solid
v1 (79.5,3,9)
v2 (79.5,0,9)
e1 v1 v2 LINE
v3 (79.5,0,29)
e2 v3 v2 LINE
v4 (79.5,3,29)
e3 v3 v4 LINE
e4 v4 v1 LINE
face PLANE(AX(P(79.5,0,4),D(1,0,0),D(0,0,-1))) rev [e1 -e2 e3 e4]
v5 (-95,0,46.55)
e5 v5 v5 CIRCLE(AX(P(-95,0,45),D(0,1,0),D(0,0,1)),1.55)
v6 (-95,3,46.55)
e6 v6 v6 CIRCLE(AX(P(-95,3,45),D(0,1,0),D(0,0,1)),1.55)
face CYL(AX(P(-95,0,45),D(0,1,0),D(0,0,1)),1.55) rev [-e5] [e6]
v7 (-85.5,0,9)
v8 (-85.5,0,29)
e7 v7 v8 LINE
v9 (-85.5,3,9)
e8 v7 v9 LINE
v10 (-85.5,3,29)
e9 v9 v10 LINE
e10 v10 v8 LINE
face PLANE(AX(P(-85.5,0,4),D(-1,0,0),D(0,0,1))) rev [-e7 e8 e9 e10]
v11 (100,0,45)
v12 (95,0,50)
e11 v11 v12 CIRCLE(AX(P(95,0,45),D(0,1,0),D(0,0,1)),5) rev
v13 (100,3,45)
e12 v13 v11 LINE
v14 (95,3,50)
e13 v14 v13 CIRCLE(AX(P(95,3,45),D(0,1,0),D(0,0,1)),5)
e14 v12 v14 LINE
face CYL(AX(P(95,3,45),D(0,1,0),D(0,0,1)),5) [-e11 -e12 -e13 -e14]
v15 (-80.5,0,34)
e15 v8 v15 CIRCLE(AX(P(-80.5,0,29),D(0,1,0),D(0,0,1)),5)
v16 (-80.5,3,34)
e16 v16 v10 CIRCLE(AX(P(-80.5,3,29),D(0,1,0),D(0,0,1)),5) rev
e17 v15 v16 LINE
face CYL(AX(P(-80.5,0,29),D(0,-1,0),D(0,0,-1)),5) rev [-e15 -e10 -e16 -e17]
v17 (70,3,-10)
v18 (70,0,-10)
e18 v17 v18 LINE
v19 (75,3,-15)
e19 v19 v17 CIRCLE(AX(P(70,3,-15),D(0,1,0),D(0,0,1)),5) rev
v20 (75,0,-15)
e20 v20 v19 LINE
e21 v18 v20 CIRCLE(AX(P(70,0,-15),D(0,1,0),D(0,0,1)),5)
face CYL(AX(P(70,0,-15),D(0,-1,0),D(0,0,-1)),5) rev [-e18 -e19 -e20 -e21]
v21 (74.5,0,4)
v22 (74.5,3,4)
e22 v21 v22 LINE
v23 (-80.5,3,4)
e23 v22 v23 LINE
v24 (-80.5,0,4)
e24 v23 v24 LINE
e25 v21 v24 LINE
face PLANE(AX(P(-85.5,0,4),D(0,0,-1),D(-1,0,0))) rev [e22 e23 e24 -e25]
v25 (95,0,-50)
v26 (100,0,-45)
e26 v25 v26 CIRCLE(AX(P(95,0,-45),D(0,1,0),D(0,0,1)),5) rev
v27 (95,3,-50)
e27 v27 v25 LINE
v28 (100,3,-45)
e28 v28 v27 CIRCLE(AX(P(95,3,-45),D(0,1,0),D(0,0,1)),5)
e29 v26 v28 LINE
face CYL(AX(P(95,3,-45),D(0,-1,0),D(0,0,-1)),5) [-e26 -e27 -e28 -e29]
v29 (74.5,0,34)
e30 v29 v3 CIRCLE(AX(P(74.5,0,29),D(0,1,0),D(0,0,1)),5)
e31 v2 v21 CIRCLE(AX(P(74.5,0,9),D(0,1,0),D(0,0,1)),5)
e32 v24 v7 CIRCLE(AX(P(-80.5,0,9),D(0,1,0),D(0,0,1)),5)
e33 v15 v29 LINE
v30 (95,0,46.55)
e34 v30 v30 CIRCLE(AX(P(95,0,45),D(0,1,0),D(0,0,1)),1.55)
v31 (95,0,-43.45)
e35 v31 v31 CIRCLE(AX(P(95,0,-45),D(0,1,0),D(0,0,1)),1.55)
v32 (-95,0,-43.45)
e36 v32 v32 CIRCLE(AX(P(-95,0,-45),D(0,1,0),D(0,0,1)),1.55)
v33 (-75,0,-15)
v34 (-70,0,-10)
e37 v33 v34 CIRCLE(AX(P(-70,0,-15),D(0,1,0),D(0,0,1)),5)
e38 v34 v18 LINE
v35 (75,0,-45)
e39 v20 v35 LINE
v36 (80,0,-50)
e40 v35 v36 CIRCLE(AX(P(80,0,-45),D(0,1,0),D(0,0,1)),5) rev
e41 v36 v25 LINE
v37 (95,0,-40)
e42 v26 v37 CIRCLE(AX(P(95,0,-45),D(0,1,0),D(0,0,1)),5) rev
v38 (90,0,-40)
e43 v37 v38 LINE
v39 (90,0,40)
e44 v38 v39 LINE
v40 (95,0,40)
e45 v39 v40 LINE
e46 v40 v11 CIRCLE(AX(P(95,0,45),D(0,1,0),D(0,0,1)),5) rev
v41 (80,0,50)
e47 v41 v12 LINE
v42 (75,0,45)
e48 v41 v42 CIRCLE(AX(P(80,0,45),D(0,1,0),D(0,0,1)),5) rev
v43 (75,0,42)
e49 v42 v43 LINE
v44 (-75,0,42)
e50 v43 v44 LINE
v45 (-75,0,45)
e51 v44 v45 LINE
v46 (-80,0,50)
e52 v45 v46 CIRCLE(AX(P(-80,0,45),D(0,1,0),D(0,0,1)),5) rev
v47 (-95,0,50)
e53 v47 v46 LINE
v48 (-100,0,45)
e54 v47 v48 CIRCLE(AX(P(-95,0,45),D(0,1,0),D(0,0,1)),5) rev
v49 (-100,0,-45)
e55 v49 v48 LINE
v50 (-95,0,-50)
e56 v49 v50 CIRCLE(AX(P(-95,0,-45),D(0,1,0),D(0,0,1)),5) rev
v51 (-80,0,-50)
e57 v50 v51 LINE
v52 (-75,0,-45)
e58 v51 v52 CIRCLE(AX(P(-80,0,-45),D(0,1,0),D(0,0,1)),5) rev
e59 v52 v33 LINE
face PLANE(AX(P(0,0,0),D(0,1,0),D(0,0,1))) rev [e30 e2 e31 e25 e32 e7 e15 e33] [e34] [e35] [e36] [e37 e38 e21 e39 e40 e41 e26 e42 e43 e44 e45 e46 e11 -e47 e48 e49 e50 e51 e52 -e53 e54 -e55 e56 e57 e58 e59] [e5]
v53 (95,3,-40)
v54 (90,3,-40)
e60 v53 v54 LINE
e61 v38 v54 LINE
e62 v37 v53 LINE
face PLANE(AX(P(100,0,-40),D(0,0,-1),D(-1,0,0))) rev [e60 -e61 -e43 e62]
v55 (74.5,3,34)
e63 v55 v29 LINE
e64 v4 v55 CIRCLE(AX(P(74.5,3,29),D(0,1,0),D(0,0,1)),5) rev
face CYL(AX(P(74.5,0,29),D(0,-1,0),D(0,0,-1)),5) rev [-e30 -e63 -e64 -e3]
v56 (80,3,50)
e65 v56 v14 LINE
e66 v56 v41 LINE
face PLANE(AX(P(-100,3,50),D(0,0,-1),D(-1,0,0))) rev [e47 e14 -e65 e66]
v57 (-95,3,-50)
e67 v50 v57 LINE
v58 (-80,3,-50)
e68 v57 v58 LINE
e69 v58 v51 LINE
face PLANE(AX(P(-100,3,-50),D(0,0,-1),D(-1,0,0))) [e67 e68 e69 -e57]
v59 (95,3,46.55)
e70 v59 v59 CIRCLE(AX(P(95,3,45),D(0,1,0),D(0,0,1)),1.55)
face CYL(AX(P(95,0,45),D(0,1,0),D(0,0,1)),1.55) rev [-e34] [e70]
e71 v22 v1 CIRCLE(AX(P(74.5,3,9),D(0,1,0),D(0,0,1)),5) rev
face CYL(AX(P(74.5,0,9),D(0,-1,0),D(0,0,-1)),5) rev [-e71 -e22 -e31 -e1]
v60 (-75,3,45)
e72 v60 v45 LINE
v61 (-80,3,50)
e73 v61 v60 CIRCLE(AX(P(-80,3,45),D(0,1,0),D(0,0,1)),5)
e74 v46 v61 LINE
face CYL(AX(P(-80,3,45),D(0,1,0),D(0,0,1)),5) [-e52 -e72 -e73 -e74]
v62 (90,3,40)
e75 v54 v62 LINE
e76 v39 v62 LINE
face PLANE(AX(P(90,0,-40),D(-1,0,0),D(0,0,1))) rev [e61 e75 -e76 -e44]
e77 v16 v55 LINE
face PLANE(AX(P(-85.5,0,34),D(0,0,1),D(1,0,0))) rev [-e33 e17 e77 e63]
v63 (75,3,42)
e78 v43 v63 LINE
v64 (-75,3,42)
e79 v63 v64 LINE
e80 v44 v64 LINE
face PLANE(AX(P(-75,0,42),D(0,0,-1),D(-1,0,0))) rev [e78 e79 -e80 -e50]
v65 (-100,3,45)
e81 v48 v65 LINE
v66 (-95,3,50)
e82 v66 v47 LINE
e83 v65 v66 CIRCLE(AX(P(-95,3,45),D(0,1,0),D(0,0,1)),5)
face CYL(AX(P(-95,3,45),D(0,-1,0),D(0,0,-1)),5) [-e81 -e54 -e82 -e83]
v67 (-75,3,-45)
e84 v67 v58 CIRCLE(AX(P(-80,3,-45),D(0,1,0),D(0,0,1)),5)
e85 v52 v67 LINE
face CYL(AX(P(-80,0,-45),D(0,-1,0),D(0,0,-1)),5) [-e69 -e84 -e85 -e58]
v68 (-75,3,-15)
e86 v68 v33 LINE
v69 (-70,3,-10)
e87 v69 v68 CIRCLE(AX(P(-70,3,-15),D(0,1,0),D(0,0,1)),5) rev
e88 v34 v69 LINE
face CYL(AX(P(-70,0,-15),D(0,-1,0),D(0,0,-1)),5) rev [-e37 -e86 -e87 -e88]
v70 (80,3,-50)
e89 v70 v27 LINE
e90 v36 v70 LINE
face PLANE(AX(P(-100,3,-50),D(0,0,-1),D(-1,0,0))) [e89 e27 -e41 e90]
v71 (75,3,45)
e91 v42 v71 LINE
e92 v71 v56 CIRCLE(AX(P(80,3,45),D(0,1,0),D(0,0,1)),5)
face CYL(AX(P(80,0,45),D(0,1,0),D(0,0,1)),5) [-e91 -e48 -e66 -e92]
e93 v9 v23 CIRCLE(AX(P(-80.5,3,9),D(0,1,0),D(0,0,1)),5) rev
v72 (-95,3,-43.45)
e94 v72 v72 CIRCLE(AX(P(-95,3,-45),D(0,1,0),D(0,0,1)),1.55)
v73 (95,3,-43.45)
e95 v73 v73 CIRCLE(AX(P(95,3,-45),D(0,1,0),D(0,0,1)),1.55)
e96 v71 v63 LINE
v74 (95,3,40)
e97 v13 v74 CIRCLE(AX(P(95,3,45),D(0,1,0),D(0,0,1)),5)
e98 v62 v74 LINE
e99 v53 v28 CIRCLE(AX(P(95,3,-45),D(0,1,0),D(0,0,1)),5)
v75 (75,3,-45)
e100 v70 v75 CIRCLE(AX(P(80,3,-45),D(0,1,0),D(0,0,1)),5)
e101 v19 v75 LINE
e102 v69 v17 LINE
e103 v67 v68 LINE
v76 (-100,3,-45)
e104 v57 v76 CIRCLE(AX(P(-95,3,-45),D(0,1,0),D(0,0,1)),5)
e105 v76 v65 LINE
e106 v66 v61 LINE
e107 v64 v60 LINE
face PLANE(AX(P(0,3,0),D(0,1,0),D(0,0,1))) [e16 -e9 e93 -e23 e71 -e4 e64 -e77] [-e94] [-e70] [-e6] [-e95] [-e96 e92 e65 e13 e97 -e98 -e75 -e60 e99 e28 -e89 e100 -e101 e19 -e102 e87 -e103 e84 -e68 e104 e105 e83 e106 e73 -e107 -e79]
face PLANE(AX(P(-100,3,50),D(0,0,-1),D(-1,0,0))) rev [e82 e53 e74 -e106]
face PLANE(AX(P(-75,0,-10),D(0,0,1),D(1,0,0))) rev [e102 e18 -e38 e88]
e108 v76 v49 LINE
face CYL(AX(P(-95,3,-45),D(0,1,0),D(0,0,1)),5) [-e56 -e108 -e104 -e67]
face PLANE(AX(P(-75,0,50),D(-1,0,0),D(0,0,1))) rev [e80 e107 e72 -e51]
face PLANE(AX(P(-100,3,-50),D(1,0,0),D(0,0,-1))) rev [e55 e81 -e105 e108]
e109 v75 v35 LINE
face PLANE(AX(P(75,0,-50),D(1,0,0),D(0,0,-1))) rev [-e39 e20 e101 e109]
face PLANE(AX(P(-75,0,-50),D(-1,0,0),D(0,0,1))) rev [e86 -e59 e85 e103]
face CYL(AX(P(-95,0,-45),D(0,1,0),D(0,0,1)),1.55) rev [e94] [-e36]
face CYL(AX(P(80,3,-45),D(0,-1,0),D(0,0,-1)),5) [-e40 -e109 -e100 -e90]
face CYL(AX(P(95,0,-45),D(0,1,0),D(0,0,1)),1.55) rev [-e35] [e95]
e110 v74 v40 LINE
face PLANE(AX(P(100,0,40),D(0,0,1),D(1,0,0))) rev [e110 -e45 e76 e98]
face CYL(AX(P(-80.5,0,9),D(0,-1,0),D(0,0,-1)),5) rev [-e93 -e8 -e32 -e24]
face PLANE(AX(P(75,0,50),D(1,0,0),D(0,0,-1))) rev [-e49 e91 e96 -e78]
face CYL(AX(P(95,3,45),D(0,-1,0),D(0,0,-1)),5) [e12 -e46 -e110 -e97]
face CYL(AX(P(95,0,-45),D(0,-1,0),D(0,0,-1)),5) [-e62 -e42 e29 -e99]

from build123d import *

# Parameters (mm, degrees)
SKETCH1_W           = 200
SKETCH1_H           = 100
BOSS_EXTRUDE1_DEPTH = 3
SKETCH2_R           = 1.55
CUT_EXTRUDE1_DEPTH  = 112.843640856
FILLET1_R           = 5
SKETCH3_W           = 150
SKETCH3_H           = 40
SKETCH3_W_2         = 10
SKETCH3_H_2         = 80
SKETCH3_H_3         = 8
SKETCH3_W_3         = 165
SKETCH3_H_4         = 30
CUT_EXTRUDE2_DEPTH  = 112.843640856
FILLET2_START       = -1
FILLET2_DEPTH       = 5
FILLET2_2_DEPTH     = 3


with BuildPart() as part:
    # Sketch1 → Boss-Extrude1 (new body)
    with BuildSketch(Plane(origin=(0, 0, 0), x_dir=(1, 0, 0), z_dir=(0, 1, 0))):
        Rectangle(SKETCH1_W, SKETCH1_H)
    extrude(amount=BOSS_EXTRUDE1_DEPTH)

    # Sketch2 → Cut-Extrude1 (cut, through all)
    with BuildSketch(Plane(origin=(0, 3, 0), x_dir=(1, 0, 0), z_dir=(0, 1, 0))):
        with Locations(Location((-95, 45, 0), (0, 0, 270))):
            Circle(SKETCH2_R)
        with Locations(Location((-95, -45, 0), (0, 0, 270))):
            Circle(SKETCH2_R)
        with Locations(Location((95, 45, 0), (0, 0, 270))):
            Circle(SKETCH2_R)
        with Locations(Location((95, -45, 0), (0, 0, 270))):
            Circle(SKETCH2_R)
    extrude(amount=-CUT_EXTRUDE1_DEPTH, mode=Mode.SUBTRACT)

    # Fillet1
    fillet1_edges = [part.edges().sort_by_distance(p)[0] for p in [
        (-100, 1.5, -50),
        (100, 1.5, -50),
        (100, 1.5, 50),
        (-100, 1.5, 50),
    ]]
    fillet(fillet1_edges, radius=FILLET1_R)

    # Sketch3 → Cut-Extrude2 (cut, through all)
    with BuildSketch(Plane(origin=(0, 3, 0), x_dir=(1, 0, 0), z_dir=(0, 1, 0))):
        with Locations((0, 30)):
            Rectangle(SKETCH3_W, SKETCH3_H)
        with Locations((95, 0)):
            Rectangle(SKETCH3_W_2, SKETCH3_H_2)
        with Locations((0, -46)):
            Rectangle(SKETCH3_W, SKETCH3_H_3)
        with Locations((-3, -19)):
            Rectangle(SKETCH3_W_3, SKETCH3_H_4)
    extrude(amount=-CUT_EXTRUDE2_DEPTH, mode=Mode.SUBTRACT)

    # Fillet2: read off the stored shape, not the designer's step
    # Fillet2 outline → Fillet2 (cut)
    with BuildSketch(Plane(origin=(0, 0, 0), x_dir=(1, 0, 0), z_dir=(0, 1, 0)).offset(FILLET2_START)):
        with BuildLine():
            Line((100, 40), (100, 45))
            ThreePointArc((100, 45), (98.535533906, 41.464466094), (95, 40))
            Line((95, 40), (100, 40))
        make_face()
        with BuildLine():
            ThreePointArc((-80, 50), (-76.464466094, 48.535533906), (-75, 45))
            Line((-75, 45), (-75, 50))
            Line((-75, 50), (-80, 50))
        make_face()
        with BuildLine():
            ThreePointArc((75, 45), (76.464466094, 48.535533906), (80, 50))
            Line((80, 50), (75, 50))
            Line((75, 50), (75, 45))
        make_face()
        with BuildLine():
            Line((100, -40), (95, -40))
            ThreePointArc((95, -40), (98.535533906, -41.464466094), (100, -45))
            Line((100, -45), (100, -40))
        make_face()
        with BuildLine():
            Line((75, -50), (80, -50))
            ThreePointArc((80, -50), (76.464466094, -48.535533906), (75, -45))
            Line((75, -45), (75, -50))
        make_face()
        with BuildLine():
            ThreePointArc((-75, -45), (-76.464466094, -48.535533906), (-80, -50))
            Line((-80, -50), (-75, -50))
            Line((-75, -50), (-75, -45))
        make_face()
    extrude(amount=FILLET2_DEPTH, mode=Mode.SUBTRACT)

    # Fillet2 2 outline → Fillet2 2 (add)
    with BuildSketch(Plane(origin=(0, 0, 0), x_dir=(1, 0, 0), z_dir=(0, 1, 0))):
        with BuildLine():
            Line((-75, 10), (-70, 10))
            ThreePointArc((-70, 10), (-73.535533906, 11.464466094), (-75, 15))
            Line((-75, 15), (-75, 10))
        make_face()
        with BuildLine():
            Line((75, 10), (75, 15))
            ThreePointArc((75, 15), (73.535533906, 11.464466094), (70, 10))
            Line((70, 10), (75, 10))
        make_face()
        with BuildLine():
            Line((79.5, -34), (79.5, -29))
            ThreePointArc((79.5, -29), (78.035533906, -32.535533906), (74.5, -34))
            Line((74.5, -34), (79.5, -34))
        make_face()
        with BuildLine():
            ThreePointArc((74.5, -4), (78.035533906, -5.464466094), (79.5, -9))
            Line((79.5, -9), (79.5, -4))
            Line((79.5, -4), (74.5, -4))
        make_face()
        with BuildLine():
            Line((-85.5, -34), (-80.5, -34))
            ThreePointArc((-80.5, -34), (-84.035533906, -32.535533906), (-85.5, -29))
            Line((-85.5, -29), (-85.5, -34))
        make_face()
        with BuildLine():
            ThreePointArc((-85.5, -9), (-84.035533906, -5.464466094), (-80.5, -4))
            Line((-80.5, -4), (-85.5, -4))
            Line((-85.5, -4), (-85.5, -9))
        make_face()
    extrude(amount=FILLET2_2_DEPTH)


solid = part.part
